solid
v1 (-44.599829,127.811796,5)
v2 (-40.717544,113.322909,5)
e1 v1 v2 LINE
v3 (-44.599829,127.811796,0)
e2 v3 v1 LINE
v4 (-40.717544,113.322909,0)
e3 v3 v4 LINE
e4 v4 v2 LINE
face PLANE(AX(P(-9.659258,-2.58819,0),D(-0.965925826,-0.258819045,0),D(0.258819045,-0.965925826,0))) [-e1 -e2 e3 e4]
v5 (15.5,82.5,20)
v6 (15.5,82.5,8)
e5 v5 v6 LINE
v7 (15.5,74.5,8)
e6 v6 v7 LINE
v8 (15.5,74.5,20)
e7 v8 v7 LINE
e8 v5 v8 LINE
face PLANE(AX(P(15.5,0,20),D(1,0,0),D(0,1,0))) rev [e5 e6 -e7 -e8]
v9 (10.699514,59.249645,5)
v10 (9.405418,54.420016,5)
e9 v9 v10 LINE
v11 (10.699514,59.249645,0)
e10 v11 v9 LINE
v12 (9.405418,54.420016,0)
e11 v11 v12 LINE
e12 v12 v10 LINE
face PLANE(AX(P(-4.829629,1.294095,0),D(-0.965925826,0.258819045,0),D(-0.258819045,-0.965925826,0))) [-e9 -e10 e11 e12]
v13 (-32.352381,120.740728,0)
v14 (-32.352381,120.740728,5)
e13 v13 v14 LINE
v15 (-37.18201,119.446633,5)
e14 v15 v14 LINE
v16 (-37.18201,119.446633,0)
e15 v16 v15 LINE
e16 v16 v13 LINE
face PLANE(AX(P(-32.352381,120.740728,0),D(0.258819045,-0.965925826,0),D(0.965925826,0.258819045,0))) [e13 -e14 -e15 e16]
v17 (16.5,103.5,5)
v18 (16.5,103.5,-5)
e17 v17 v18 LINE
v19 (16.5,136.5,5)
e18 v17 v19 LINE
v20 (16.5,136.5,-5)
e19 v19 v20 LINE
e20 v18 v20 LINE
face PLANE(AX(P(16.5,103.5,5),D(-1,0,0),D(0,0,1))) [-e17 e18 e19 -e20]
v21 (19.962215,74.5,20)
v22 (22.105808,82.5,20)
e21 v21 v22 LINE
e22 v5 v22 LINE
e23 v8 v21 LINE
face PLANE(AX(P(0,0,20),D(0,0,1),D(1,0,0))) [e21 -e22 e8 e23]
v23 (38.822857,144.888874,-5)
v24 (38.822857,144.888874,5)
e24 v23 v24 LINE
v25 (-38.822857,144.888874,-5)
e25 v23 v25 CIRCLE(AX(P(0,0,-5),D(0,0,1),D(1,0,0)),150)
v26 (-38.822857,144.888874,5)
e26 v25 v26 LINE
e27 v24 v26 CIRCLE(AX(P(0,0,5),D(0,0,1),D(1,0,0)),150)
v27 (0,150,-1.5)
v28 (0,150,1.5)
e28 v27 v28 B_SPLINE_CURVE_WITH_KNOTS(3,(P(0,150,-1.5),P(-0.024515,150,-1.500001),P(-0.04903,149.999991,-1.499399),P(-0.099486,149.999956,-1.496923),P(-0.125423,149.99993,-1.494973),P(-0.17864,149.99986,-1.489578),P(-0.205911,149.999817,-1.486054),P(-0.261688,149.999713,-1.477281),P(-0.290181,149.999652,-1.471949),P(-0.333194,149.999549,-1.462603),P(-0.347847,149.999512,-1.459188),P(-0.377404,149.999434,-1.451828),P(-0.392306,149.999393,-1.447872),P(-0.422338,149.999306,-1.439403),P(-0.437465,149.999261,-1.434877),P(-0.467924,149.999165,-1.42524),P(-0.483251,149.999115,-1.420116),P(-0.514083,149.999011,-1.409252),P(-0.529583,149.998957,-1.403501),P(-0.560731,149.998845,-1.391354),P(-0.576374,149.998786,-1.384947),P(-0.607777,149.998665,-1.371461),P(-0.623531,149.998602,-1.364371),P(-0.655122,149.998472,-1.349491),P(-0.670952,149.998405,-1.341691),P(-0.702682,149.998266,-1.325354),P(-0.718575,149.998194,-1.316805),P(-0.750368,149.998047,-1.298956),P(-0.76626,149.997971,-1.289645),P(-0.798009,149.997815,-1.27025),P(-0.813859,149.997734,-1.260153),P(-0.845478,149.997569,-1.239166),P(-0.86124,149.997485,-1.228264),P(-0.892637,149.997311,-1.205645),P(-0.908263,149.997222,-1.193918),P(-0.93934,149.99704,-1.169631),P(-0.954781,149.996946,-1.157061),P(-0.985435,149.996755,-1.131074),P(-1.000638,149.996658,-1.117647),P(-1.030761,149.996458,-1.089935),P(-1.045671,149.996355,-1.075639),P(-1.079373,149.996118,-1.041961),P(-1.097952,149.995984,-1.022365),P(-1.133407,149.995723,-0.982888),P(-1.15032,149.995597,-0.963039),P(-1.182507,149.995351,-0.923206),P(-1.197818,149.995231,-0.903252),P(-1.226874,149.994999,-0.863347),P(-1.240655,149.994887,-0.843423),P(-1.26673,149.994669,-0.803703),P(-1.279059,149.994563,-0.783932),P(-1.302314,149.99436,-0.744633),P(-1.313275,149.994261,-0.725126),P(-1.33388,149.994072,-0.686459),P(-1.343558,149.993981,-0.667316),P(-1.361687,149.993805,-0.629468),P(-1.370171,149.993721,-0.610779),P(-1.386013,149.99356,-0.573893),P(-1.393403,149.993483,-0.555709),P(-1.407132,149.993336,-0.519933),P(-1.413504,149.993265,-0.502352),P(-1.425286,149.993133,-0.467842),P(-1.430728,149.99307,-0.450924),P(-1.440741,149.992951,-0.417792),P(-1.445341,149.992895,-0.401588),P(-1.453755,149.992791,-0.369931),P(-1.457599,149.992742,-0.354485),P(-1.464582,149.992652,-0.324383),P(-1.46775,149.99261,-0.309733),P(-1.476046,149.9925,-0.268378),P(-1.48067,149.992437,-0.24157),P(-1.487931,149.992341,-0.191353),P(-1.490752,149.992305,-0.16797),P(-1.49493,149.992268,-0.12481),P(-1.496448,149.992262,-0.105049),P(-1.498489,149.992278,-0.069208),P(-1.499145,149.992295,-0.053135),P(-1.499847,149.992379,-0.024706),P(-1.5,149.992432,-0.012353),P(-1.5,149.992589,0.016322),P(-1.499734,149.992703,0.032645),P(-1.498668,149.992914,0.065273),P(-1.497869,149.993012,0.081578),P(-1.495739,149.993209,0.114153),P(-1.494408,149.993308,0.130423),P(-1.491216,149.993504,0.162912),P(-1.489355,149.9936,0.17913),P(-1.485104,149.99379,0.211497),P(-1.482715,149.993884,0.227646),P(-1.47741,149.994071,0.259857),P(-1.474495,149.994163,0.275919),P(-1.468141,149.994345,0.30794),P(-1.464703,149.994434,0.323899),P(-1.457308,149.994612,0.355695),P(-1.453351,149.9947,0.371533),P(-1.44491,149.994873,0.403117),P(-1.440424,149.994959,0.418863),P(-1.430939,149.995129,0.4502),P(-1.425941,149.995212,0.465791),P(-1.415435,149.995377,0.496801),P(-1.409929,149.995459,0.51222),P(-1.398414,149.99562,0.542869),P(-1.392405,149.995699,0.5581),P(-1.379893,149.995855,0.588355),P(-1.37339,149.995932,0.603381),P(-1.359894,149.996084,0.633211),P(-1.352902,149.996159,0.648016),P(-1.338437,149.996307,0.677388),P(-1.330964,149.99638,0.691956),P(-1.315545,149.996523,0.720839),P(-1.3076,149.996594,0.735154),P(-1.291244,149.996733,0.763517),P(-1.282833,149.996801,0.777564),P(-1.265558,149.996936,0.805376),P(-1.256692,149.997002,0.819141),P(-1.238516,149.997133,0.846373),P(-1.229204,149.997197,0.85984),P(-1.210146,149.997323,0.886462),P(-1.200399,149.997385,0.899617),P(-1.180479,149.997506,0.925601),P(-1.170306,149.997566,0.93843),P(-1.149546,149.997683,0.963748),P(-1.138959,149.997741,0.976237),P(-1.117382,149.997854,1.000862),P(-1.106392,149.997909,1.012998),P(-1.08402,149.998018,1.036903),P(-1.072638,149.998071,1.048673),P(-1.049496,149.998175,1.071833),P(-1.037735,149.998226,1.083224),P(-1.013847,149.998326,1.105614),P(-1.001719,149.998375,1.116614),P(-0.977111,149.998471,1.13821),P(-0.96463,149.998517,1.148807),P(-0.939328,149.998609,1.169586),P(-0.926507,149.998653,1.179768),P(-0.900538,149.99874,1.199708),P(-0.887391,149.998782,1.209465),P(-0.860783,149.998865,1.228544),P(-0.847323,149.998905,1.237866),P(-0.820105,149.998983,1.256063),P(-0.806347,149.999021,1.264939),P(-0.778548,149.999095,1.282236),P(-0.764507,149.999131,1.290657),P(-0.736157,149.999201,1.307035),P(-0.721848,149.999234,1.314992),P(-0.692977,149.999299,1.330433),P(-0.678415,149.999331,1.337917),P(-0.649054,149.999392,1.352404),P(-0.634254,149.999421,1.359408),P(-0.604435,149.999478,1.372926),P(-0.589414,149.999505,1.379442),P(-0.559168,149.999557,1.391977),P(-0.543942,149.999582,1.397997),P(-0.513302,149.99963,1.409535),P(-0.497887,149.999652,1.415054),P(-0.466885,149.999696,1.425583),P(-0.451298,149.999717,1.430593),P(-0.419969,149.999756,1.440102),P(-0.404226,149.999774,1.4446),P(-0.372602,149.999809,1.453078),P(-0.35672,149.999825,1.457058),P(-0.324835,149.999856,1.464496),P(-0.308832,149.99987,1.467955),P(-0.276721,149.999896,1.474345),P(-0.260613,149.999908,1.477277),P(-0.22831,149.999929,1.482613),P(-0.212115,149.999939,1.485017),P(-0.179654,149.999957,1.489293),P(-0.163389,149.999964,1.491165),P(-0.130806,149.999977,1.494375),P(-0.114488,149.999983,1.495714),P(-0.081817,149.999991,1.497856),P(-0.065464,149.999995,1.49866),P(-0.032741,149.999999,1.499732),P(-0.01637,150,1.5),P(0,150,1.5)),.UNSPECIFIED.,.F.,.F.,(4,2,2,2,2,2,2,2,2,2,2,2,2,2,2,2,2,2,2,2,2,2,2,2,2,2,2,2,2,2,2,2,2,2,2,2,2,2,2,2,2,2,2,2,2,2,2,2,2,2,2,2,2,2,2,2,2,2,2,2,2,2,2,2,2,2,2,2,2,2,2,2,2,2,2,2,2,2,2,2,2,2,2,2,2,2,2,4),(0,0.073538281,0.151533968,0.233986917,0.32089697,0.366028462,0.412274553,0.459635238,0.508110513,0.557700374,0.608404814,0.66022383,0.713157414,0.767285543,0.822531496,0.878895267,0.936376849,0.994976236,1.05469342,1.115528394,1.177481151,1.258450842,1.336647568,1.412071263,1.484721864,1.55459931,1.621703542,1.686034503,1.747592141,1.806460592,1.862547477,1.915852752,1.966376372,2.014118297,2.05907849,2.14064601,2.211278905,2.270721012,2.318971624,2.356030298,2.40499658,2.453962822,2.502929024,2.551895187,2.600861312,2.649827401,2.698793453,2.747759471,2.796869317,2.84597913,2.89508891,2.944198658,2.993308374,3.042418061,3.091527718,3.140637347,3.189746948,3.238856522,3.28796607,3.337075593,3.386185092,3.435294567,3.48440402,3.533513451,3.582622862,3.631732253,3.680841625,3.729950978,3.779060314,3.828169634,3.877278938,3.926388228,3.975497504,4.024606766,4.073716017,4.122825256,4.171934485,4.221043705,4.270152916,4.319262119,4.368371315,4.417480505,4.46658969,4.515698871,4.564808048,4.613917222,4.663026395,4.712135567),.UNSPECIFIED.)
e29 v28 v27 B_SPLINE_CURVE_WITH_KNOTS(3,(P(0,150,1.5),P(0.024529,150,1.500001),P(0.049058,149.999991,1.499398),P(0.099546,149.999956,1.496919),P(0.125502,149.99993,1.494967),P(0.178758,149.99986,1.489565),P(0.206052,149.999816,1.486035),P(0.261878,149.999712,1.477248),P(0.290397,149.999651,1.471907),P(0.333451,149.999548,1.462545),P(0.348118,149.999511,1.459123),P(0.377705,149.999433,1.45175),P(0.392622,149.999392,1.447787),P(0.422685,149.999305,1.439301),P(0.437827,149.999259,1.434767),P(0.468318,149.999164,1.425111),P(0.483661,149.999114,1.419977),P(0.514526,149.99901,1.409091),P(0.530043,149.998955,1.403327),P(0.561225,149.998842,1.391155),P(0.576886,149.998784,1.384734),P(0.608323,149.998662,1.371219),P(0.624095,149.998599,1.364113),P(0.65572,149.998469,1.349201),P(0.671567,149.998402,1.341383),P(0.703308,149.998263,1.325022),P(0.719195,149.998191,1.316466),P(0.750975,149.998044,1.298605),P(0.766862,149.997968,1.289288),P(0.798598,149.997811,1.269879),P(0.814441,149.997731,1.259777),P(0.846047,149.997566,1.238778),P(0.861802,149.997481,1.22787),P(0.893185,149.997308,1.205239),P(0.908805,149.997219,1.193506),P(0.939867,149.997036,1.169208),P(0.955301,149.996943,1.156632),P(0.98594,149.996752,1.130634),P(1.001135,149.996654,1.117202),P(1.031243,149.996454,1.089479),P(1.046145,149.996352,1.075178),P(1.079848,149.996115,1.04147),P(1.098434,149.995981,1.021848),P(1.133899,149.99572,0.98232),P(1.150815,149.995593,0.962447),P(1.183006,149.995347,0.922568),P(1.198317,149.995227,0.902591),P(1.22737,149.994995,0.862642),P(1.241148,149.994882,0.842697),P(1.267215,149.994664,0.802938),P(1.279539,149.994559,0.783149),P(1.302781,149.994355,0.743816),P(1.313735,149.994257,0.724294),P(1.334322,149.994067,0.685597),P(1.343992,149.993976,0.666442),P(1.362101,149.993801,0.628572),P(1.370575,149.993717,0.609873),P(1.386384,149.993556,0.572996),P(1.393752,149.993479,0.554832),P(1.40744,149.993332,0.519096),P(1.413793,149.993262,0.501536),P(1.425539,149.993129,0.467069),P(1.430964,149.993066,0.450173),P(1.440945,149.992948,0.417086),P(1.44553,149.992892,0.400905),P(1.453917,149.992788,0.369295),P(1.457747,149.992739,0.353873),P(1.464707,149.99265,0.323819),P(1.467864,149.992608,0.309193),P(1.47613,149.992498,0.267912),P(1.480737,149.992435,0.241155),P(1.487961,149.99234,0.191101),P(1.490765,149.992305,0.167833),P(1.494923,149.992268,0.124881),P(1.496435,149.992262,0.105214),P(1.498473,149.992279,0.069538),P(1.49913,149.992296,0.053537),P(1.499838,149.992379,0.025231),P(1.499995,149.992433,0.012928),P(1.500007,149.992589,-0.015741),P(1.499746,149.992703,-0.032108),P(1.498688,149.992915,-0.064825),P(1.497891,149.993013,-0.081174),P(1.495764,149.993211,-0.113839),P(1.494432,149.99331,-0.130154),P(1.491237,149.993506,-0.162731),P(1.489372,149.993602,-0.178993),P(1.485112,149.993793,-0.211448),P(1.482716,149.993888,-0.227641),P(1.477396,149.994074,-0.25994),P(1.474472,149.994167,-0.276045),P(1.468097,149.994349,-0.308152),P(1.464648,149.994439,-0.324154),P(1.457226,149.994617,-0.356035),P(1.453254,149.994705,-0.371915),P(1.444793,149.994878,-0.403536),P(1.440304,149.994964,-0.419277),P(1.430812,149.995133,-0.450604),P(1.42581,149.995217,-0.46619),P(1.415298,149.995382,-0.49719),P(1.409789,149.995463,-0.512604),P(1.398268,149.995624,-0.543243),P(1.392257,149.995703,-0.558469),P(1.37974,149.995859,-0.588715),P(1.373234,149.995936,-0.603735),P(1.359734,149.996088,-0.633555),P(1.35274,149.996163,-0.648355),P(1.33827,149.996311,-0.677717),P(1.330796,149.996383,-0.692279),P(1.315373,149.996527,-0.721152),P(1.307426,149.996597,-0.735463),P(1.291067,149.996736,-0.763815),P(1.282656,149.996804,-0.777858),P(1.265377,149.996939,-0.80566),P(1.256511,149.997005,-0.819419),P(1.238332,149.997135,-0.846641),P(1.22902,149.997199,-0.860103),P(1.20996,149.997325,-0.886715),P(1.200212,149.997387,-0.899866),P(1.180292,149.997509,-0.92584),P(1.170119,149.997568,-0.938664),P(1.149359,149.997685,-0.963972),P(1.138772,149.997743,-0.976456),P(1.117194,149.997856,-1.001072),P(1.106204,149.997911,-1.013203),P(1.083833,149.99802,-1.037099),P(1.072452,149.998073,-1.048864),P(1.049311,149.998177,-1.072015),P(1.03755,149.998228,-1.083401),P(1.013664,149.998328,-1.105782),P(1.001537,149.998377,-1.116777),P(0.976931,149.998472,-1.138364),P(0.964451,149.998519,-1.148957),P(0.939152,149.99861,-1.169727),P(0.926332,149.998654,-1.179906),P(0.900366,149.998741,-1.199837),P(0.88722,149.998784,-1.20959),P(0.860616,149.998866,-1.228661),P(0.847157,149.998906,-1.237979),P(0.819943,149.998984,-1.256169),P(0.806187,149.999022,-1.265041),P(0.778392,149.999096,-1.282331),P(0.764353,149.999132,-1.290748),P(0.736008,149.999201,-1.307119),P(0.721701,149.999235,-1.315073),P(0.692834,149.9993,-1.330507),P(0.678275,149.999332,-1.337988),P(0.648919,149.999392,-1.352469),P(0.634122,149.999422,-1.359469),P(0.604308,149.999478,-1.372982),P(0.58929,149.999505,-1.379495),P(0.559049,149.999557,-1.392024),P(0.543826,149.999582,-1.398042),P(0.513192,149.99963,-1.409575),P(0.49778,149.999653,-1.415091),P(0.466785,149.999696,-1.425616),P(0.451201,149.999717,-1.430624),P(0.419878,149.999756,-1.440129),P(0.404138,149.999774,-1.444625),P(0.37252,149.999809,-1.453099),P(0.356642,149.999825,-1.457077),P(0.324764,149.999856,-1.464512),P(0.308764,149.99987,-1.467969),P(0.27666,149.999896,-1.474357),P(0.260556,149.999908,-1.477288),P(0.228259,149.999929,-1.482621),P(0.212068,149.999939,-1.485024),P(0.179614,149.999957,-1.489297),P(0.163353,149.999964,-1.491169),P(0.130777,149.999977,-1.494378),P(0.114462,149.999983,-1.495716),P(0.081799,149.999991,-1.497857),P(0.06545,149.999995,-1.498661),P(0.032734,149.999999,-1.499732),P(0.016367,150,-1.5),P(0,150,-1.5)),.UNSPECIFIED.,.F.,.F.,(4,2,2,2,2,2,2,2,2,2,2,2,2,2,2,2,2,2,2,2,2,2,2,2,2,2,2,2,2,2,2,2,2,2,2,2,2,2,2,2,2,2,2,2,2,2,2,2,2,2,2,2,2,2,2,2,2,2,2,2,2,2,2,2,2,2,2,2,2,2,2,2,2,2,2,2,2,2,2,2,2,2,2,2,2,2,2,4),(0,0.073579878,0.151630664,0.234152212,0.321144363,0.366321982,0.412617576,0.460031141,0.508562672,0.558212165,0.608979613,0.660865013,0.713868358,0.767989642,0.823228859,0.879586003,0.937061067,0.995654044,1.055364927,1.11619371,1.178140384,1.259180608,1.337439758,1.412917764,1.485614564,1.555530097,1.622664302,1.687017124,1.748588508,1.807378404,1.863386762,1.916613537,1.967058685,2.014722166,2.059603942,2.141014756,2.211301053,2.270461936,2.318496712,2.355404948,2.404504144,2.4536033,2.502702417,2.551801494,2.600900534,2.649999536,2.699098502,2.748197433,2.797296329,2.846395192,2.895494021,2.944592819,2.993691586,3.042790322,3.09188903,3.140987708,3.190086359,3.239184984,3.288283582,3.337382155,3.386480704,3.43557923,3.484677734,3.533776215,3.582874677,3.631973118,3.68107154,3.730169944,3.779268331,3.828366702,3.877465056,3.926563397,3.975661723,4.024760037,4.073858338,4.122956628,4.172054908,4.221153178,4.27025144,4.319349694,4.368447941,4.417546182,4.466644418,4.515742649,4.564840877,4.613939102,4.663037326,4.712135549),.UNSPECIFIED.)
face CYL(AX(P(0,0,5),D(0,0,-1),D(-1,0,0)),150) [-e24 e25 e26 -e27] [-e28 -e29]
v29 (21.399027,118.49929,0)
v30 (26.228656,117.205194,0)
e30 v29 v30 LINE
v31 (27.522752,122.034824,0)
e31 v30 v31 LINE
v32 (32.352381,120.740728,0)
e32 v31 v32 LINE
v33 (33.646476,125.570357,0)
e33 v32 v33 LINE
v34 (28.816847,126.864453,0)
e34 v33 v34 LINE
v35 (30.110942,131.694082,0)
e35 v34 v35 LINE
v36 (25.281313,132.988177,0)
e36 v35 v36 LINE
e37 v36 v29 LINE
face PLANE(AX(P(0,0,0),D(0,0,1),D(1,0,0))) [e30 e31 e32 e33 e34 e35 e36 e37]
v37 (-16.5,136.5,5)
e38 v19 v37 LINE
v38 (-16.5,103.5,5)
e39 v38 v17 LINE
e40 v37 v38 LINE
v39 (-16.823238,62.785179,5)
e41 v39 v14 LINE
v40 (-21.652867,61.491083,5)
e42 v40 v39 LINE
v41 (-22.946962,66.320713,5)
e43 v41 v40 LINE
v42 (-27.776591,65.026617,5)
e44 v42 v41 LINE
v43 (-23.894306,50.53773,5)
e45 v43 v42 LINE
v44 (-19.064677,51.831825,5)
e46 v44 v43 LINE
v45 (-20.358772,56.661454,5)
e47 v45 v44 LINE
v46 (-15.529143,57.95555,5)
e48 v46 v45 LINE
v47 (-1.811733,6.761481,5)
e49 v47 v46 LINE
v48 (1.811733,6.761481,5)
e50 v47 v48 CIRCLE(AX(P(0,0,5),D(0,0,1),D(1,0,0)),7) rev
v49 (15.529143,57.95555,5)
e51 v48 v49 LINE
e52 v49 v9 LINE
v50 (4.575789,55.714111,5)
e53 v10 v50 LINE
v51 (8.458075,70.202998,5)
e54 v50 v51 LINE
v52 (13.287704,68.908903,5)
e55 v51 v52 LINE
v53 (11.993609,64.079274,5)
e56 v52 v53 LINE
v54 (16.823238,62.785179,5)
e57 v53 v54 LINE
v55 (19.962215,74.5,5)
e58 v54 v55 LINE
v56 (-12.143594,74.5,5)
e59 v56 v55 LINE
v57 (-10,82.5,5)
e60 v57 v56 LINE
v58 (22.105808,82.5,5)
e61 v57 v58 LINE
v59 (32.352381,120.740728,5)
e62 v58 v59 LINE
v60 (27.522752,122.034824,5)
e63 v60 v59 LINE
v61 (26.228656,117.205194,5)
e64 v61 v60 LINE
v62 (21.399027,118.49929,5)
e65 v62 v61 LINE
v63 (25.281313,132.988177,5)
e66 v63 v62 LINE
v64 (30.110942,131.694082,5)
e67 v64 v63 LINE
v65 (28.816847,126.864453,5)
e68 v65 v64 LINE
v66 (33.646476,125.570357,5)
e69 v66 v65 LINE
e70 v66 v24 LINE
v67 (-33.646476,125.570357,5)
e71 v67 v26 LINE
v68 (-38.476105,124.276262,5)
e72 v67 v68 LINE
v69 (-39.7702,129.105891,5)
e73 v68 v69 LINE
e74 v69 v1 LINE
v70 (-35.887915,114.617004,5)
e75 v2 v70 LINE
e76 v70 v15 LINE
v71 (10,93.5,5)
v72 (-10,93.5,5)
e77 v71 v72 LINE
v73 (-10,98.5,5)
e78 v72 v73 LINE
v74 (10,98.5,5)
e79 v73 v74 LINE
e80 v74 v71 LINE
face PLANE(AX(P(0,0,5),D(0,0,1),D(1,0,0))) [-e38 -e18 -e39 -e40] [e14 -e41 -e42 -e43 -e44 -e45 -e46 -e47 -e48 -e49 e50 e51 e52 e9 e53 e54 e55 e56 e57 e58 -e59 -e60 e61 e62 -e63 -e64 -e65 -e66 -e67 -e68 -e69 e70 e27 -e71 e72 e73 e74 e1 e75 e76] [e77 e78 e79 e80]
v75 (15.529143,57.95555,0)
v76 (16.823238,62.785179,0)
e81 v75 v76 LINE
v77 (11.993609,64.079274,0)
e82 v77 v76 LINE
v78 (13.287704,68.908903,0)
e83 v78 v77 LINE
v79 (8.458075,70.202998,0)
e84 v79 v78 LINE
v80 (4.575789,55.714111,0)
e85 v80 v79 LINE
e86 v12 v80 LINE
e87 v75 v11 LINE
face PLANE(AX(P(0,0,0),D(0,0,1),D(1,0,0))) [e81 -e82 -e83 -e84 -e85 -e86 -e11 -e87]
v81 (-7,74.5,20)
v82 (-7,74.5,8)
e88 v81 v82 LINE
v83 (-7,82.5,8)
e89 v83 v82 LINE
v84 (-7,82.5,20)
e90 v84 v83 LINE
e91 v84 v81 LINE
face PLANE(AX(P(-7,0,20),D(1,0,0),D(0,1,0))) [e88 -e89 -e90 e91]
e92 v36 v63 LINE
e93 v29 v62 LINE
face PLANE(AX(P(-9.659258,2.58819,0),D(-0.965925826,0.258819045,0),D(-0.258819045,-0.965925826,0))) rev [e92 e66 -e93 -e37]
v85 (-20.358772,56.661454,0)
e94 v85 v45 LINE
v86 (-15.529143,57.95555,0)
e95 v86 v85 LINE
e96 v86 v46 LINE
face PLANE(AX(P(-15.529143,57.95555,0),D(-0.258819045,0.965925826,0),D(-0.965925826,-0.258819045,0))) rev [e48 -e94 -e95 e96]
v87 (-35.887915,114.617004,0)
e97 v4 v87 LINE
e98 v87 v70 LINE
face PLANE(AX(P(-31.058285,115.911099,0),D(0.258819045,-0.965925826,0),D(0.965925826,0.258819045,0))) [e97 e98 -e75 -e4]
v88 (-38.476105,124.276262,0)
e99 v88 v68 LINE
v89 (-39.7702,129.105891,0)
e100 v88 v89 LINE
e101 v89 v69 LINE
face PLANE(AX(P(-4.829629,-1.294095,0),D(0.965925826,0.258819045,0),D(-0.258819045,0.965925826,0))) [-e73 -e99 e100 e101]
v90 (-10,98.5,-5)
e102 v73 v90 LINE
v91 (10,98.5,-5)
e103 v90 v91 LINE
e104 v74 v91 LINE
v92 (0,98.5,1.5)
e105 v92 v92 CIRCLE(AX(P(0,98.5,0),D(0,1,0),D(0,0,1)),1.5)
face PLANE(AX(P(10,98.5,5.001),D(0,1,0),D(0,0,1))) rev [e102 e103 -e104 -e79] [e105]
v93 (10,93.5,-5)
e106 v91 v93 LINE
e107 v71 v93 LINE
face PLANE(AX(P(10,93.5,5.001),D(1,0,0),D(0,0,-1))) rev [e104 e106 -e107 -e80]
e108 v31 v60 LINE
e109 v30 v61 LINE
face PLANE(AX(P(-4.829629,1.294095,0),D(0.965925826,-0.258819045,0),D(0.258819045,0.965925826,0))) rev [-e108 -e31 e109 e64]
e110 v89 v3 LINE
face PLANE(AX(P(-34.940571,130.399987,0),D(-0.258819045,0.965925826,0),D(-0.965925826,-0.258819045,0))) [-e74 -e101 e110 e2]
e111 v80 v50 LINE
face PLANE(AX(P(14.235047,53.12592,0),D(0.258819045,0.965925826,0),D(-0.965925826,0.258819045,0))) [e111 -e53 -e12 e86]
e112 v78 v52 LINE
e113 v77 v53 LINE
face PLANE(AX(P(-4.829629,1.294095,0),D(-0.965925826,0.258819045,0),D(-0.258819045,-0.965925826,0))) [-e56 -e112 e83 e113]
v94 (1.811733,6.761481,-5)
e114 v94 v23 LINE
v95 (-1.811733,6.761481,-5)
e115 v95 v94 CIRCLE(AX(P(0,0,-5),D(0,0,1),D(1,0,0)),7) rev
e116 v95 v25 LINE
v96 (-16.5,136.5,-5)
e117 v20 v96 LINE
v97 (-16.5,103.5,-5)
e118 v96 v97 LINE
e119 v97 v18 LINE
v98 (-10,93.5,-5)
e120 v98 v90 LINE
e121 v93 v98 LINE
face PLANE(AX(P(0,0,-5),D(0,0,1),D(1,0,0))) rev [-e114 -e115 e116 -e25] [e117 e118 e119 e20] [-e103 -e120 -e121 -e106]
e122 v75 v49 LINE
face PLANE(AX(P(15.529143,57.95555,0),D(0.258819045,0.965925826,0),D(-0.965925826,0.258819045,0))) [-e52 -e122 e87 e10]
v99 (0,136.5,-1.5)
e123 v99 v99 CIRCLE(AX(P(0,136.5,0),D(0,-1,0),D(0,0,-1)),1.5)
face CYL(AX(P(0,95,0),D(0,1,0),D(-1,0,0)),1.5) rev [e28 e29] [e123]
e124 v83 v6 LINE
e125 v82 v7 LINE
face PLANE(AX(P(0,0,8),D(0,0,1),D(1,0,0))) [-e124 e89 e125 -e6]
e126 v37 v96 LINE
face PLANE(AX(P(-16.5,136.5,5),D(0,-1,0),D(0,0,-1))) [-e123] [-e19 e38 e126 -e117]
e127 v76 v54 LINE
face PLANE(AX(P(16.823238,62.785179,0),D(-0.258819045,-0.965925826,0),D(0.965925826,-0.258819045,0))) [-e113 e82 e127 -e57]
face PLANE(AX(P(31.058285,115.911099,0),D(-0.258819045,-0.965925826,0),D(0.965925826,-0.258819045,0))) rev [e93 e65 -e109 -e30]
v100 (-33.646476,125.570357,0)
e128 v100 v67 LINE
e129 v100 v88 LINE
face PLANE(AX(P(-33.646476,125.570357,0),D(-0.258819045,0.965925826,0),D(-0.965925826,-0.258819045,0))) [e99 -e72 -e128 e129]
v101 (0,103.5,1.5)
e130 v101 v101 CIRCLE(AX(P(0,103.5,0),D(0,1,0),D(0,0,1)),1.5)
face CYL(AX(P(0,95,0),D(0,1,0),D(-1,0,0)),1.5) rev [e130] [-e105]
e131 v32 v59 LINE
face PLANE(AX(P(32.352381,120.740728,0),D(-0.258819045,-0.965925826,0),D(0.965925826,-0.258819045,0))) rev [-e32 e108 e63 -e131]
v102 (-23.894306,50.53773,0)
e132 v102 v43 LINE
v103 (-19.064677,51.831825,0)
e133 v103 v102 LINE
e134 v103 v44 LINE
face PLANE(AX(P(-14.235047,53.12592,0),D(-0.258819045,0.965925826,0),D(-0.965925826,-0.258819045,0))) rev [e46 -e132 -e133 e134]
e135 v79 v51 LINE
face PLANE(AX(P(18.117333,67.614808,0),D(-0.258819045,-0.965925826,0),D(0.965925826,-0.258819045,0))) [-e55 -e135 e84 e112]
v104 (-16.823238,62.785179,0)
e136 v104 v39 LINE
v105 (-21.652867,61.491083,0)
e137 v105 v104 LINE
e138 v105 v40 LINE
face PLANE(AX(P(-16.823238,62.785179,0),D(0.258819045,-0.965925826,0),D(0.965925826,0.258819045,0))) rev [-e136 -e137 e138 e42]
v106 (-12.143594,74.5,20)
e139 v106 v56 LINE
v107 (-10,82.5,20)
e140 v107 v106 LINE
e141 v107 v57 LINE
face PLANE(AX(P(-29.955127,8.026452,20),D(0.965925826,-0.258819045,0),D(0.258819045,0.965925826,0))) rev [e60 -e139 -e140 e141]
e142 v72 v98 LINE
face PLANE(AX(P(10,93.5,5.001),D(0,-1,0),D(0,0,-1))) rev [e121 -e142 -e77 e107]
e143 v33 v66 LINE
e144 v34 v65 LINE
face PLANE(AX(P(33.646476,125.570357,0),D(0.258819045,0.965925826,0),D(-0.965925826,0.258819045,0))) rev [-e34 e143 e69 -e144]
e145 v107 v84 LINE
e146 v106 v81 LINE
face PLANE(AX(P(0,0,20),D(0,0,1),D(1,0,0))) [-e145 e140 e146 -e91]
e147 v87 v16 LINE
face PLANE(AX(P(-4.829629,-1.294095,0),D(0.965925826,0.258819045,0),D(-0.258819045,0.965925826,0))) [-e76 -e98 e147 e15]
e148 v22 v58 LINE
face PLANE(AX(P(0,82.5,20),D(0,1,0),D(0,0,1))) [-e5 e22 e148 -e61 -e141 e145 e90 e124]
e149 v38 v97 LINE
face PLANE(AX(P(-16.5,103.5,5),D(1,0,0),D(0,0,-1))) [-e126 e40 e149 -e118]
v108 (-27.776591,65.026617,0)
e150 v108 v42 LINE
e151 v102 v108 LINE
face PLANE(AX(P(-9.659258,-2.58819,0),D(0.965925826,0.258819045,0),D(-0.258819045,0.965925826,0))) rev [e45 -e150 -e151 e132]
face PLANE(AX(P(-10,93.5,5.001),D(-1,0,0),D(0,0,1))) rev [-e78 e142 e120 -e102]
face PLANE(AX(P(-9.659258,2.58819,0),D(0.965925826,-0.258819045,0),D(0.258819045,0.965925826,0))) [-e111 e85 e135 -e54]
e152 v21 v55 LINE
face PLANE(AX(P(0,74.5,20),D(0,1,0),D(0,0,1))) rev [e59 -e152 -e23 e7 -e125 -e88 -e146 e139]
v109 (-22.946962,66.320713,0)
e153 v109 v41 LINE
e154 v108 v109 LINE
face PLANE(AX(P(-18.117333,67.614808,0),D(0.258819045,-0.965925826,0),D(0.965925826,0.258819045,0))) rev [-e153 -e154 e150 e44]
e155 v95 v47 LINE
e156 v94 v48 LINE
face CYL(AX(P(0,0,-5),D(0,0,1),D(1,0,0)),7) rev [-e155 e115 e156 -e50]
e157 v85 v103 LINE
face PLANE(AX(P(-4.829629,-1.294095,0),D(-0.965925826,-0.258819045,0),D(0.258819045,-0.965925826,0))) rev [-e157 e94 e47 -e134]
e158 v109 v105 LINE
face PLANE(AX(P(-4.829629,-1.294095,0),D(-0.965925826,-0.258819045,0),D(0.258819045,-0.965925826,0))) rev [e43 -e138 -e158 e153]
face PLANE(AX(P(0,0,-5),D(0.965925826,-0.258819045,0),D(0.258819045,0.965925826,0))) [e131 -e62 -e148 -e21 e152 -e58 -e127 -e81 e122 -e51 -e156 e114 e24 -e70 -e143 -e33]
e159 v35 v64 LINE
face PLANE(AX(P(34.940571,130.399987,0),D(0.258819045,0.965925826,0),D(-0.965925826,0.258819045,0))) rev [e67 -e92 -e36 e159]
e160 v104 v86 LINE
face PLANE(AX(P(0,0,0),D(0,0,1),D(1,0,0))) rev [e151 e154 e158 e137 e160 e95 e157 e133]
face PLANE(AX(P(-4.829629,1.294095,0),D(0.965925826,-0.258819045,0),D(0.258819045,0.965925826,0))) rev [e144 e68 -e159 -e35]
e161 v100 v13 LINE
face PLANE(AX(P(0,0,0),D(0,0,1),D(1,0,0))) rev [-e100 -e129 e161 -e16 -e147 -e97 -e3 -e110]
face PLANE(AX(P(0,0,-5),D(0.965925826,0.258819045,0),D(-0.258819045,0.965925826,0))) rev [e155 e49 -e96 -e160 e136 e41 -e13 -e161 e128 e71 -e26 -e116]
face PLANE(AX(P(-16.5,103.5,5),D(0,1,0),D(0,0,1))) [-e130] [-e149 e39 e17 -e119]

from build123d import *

# Parameters (mm, degrees)
SKETCH1_R           = 150
SKETCH1_W           = 33
SKETCH1_H           = 33
BOSS_EXTRUDE1_DEPTH = 5
SKETCH4_R           = 1.5
CUT_EXTRUDE1_DEPTH  = 55
CIRPATTERN1_COUNT   = 12
CUT_EXTRUDE2_REACH  = 214.368
SKETCH5_W           = 20
SKETCH5_H           = 5
SKETCH5_W_2         = 5
SKETCH5_H_2         = 20
CUT_EXTRUDE3_DEPTH  = 10
BOSS_EXTRUDE2_DEPTH = 5
CUT_EXTRUDE4_DEPTH  = 5
BOSS_EXTRUDE3_DEPTH = 15
SKETCH11_W          = 22.5
SKETCH11_H          = 8
BOSS_EXTRUDE4_DEPTH = 3


with BuildPart() as part:
    # Sketch1 → Boss-Extrude1 (new, symmetric)
    with BuildSketch(Plane.XY):
        Circle(SKETCH1_R)
        Polygon((37.460580838, 97.883629292), (66.039419162, 81.383629292), (82.539419162, 109.962467617), (53.960580838, 126.462467617), align=None, mode=Mode.SUBTRACT)
        with Locations((0, 120)):
            Rectangle(SKETCH1_W, SKETCH1_H, mode=Mode.SUBTRACT)
        Polygon((81.383629292, 66.039419162), (97.883629292, 37.460580838), (126.462467617, 53.960580838), (109.962467617, 82.539419162), align=None, mode=Mode.SUBTRACT)
        with Locations((120, 0)):
            Rectangle(SKETCH1_W, SKETCH1_H, mode=Mode.SUBTRACT)
        Polygon((97.883629292, -37.460580838), (81.383629292, -66.039419162), (109.962467617, -82.539419162), (126.462467617, -53.960580838), align=None, mode=Mode.SUBTRACT)
        Polygon((66.039419162, -81.383629292), (37.460580838, -97.883629292), (53.960580838, -126.462467617), (82.539419162, -109.962467617), align=None, mode=Mode.SUBTRACT)
        with Locations((0, -120)):
            Rectangle(SKETCH1_W, SKETCH1_H, mode=Mode.SUBTRACT)
        Polygon((-37.460580838, -97.883629292), (-66.039419162, -81.383629292), (-82.539419162, -109.962467617), (-53.960580838, -126.462467617), align=None, mode=Mode.SUBTRACT)
        Polygon((-81.383629292, -66.039419162), (-97.883629292, -37.460580838), (-126.462467617, -53.960580838), (-109.962467617, -82.539419162), align=None, mode=Mode.SUBTRACT)
        with Locations((-120, 0)):
            Rectangle(SKETCH1_W, SKETCH1_H, mode=Mode.SUBTRACT)
        Polygon((-97.883629292, 37.460580838), (-81.383629292, 66.039419162), (-109.962467617, 82.539419162), (-126.462467617, 53.960580838), align=None, mode=Mode.SUBTRACT)
        Polygon((-66.039419162, 81.383629292), (-37.460580838, 97.883629292), (-53.960580838, 126.462467617), (-82.539419162, 109.962467617), align=None, mode=Mode.SUBTRACT)
    extrude(amount=BOSS_EXTRUDE1_DEPTH, both=True)

    # Sketch4 → Cut-Extrude1 (cut)
    with BuildSketch(Plane(origin=(0, -150, 0), x_dir=(-1, 0, 0), z_dir=(0, -1, 0))):
        Circle(SKETCH4_R)
    cut_extrude1 = extrude(amount=-CUT_EXTRUDE1_DEPTH, mode=Mode.SUBTRACT)

    # CirPattern1: Cut-Extrude1 ×12 about axis
    cirpattern1_axis = Axis((0, 0, 5), (0, 0, -1))
    for i in range(1, CIRPATTERN1_COUNT):
        add(cut_extrude1.rotate(cirpattern1_axis, i * 360 / CIRPATTERN1_COUNT), mode=Mode.SUBTRACT)

    # Sketch5 → Cut-Extrude2 (cut, up to next)
    with BuildSketch(Plane(origin=(0, 0, -5), x_dir=(-1, 0, 0), z_dir=(0, 0, -1)), mode=Mode.PRIVATE) as cut_extrude2_sk1:
        Polygon((38.089745962, 85.973375254), (55.410254038, 75.973375254), (57.910254038, 80.303502273), (40.589745962, 90.303502273), align=None)
    cut_extrude2_tool1 = extrude(cut_extrude2_sk1.sketch, amount=-CUT_EXTRUDE2_REACH, mode=Mode.PRIVATE) & part.part
    # Sketch5 → Cut-Extrude2 (cut, up to next)
    with BuildSketch(Plane(origin=(0, 0, -5), x_dir=(-1, 0, 0), z_dir=(0, 0, -1)), mode=Mode.PRIVATE) as cut_extrude2_sk2:
        with Locations((0, 96)):
            Rectangle(SKETCH5_W, SKETCH5_H)
    cut_extrude2_tool2 = extrude(cut_extrude2_sk2.sketch, amount=-CUT_EXTRUDE2_REACH, mode=Mode.PRIVATE) & part.part
    # Sketch5 → Cut-Extrude2 (cut, up to next)
    with BuildSketch(Plane(origin=(0, 0, -5), x_dir=(-1, 0, 0), z_dir=(0, 0, -1)), mode=Mode.PRIVATE) as cut_extrude2_sk3:
        Polygon((75.973375254, 55.410254038), (85.973375254, 38.089745962), (90.303502273, 40.589745962), (80.303502273, 57.910254038), align=None)
    cut_extrude2_tool3 = extrude(cut_extrude2_sk3.sketch, amount=-CUT_EXTRUDE2_REACH, mode=Mode.PRIVATE) & part.part
    # Sketch5 → Cut-Extrude2 (cut, up to next)
    with BuildSketch(Plane(origin=(0, 0, -5), x_dir=(-1, 0, 0), z_dir=(0, 0, -1)), mode=Mode.PRIVATE) as cut_extrude2_sk4:
        with Locations((96, 0)):
            Rectangle(SKETCH5_W_2, SKETCH5_H_2)
    cut_extrude2_tool4 = extrude(cut_extrude2_sk4.sketch, amount=-CUT_EXTRUDE2_REACH, mode=Mode.PRIVATE) & part.part
    # Sketch5 → Cut-Extrude2 (cut, up to next)
    with BuildSketch(Plane(origin=(0, 0, -5), x_dir=(-1, 0, 0), z_dir=(0, 0, -1)), mode=Mode.PRIVATE) as cut_extrude2_sk5:
        Polygon((85.973375254, -38.089745962), (75.973375254, -55.410254038), (80.303502273, -57.910254038), (90.303502273, -40.589745962), align=None)
    cut_extrude2_tool5 = extrude(cut_extrude2_sk5.sketch, amount=-CUT_EXTRUDE2_REACH, mode=Mode.PRIVATE) & part.part
    # Sketch5 → Cut-Extrude2 (cut, up to next)
    with BuildSketch(Plane(origin=(0, 0, -5), x_dir=(-1, 0, 0), z_dir=(0, 0, -1)), mode=Mode.PRIVATE) as cut_extrude2_sk6:
        Polygon((55.410254038, -75.973375254), (38.089745962, -85.973375254), (40.589745962, -90.303502273), (57.910254038, -80.303502273), align=None)
    cut_extrude2_tool6 = extrude(cut_extrude2_sk6.sketch, amount=-CUT_EXTRUDE2_REACH, mode=Mode.PRIVATE) & part.part
    # Sketch5 → Cut-Extrude2 (cut, up to next)
    with BuildSketch(Plane(origin=(0, 0, -5), x_dir=(-1, 0, 0), z_dir=(0, 0, -1)), mode=Mode.PRIVATE) as cut_extrude2_sk7:
        with Locations((0, -96)):
            Rectangle(SKETCH5_W, SKETCH5_H)
    cut_extrude2_tool7 = extrude(cut_extrude2_sk7.sketch, amount=-CUT_EXTRUDE2_REACH, mode=Mode.PRIVATE) & part.part
    # Sketch5 → Cut-Extrude2 (cut, up to next)
    with BuildSketch(Plane(origin=(0, 0, -5), x_dir=(-1, 0, 0), z_dir=(0, 0, -1)), mode=Mode.PRIVATE) as cut_extrude2_sk8:
        Polygon((-38.089745962, -85.973375254), (-55.410254038, -75.973375254), (-57.910254038, -80.303502273), (-40.589745962, -90.303502273), align=None)
    cut_extrude2_tool8 = extrude(cut_extrude2_sk8.sketch, amount=-CUT_EXTRUDE2_REACH, mode=Mode.PRIVATE) & part.part
    # Sketch5 → Cut-Extrude2 (cut, up to next)
    with BuildSketch(Plane(origin=(0, 0, -5), x_dir=(-1, 0, 0), z_dir=(0, 0, -1)), mode=Mode.PRIVATE) as cut_extrude2_sk9:
        Polygon((-75.973375254, -55.410254038), (-85.973375254, -38.089745962), (-90.303502273, -40.589745962), (-80.303502273, -57.910254038), align=None)
    cut_extrude2_tool9 = extrude(cut_extrude2_sk9.sketch, amount=-CUT_EXTRUDE2_REACH, mode=Mode.PRIVATE) & part.part
    # Sketch5 → Cut-Extrude2 (cut, up to next)
    with BuildSketch(Plane(origin=(0, 0, -5), x_dir=(-1, 0, 0), z_dir=(0, 0, -1)), mode=Mode.PRIVATE) as cut_extrude2_sk10:
        with Locations((-96, 0)):
            Rectangle(SKETCH5_W_2, SKETCH5_H_2)
    cut_extrude2_tool10 = extrude(cut_extrude2_sk10.sketch, amount=-CUT_EXTRUDE2_REACH, mode=Mode.PRIVATE) & part.part
    # Sketch5 → Cut-Extrude2 (cut, up to next)
    with BuildSketch(Plane(origin=(0, 0, -5), x_dir=(-1, 0, 0), z_dir=(0, 0, -1)), mode=Mode.PRIVATE) as cut_extrude2_sk11:
        Polygon((-85.973375254, 38.089745962), (-75.973375254, 55.410254038), (-80.303502273, 57.910254038), (-90.303502273, 40.589745962), align=None)
    cut_extrude2_tool11 = extrude(cut_extrude2_sk11.sketch, amount=-CUT_EXTRUDE2_REACH, mode=Mode.PRIVATE) & part.part
    # Sketch5 → Cut-Extrude2 (cut, up to next)
    with BuildSketch(Plane(origin=(0, 0, -5), x_dir=(-1, 0, 0), z_dir=(0, 0, -1)), mode=Mode.PRIVATE) as cut_extrude2_sk12:
        Polygon((-55.410254038, 75.973375254), (-38.089745962, 85.973375254), (-40.589745962, 90.303502273), (-57.910254038, 80.303502273), align=None)
    cut_extrude2_tool12 = extrude(cut_extrude2_sk12.sketch, amount=-CUT_EXTRUDE2_REACH, mode=Mode.PRIVATE) & part.part
    add(cut_extrude2_tool1.solids().sort_by_distance((-48, 83.138439, -5))[0], mode=Mode.SUBTRACT)
    add(cut_extrude2_tool2.solids().sort_by_distance((0, 96, -5))[0], mode=Mode.SUBTRACT)
    add(cut_extrude2_tool3.solids().sort_by_distance((-83.138439, 48, -5))[0], mode=Mode.SUBTRACT)
    add(cut_extrude2_tool4.solids().sort_by_distance((-96, 0, -5))[0], mode=Mode.SUBTRACT)
    add(cut_extrude2_tool5.solids().sort_by_distance((-83.138439, -48, -5))[0], mode=Mode.SUBTRACT)
    add(cut_extrude2_tool6.solids().sort_by_distance((-48, -83.138439, -5))[0], mode=Mode.SUBTRACT)
    add(cut_extrude2_tool7.solids().sort_by_distance((0, -96, -5))[0], mode=Mode.SUBTRACT)
    add(cut_extrude2_tool8.solids().sort_by_distance((48, -83.138439, -5))[0], mode=Mode.SUBTRACT)
    add(cut_extrude2_tool9.solids().sort_by_distance((83.138439, -48, -5))[0], mode=Mode.SUBTRACT)
    add(cut_extrude2_tool10.solids().sort_by_distance((96, 0, -5))[0], mode=Mode.SUBTRACT)
    add(cut_extrude2_tool11.solids().sort_by_distance((83.138439, 48, -5))[0], mode=Mode.SUBTRACT)
    add(cut_extrude2_tool12.solids().sort_by_distance((48, 83.138439, -5))[0], mode=Mode.SUBTRACT)

    # Sketch6 → Cut-Extrude3 (cut)
    with BuildSketch(Plane.XY.offset(5)):
        with BuildLine():
            Line((38.822856765, 144.888873943), (1.811733316, 6.761480784))
            ThreePointArc((1.811733316, 6.761480784), (0, 7), (-1.811733316, 6.761480784))
            Line((-1.811733316, 6.761480784), (-38.822856765, 144.888873943))
            ThreePointArc((-38.822856765, 144.888873943), (0, -150), (38.822856765, 144.888873943))
        make_face()
    extrude(amount=-CUT_EXTRUDE3_DEPTH, mode=Mode.SUBTRACT)

    # Sketch7 → Boss-Extrude2 (add)
    with BuildSketch(Plane.XY.offset(5)):
        Polygon((-20.358771838, 56.661454352), (-15.529142706, 57.955549577), (-16.823237932, 62.785178709), (-21.652867063, 61.491083483), (-22.946962289, 66.320712615), (-27.77659142, 65.026617389), (-23.894305744, 50.537729995), (-19.064676612, 51.83182522), align=None)
        Polygon((-37.182009769, 119.446633061), (-32.352380638, 120.740728286), (-33.646475863, 125.570357418), (-38.476104995, 124.276262192), (-39.77020022, 129.105891324), (-44.599829352, 127.811796098), (-40.717543675, 113.322908704), (-35.887914544, 114.617003929), align=None)
    extrude(amount=-BOSS_EXTRUDE2_DEPTH)

    # Sketch9 → Cut-Extrude4 (cut)
    with BuildSketch(Plane.XY.offset(5)):
        Polygon((32.352380638, 120.740728286), (33.646475863, 125.570357418), (28.816846732, 126.864452643), (30.110941957, 131.694081775), (25.281312826, 132.988177), (21.399027149, 118.499289606), (26.228656281, 117.20519438), (27.522751506, 122.034823512), align=None)
        Polygon((15.529142706, 57.955549577), (16.823237932, 62.785178709), (11.9936088, 64.079273934), (13.287704026, 68.908903066), (8.458074894, 70.202998291), (4.575789218, 55.714110897), (9.405418349, 54.420015671), (10.699513575, 59.249644803), align=None)
    extrude(amount=-CUT_EXTRUDE4_DEPTH, mode=Mode.SUBTRACT)

    # Sketch10 → Boss-Extrude3 (add)
    with BuildSketch(Plane.XY.offset(5)):
        Polygon((-7, 82.5), (-10, 82.5), (-12.143593539, 74.5), (-7, 74.5), align=None)
        Polygon((22.105808376, 82.5), (15.5, 82.5), (15.5, 74.5), (19.962214836, 74.5), align=None)
    extrude(amount=BOSS_EXTRUDE3_DEPTH)

    # Sketch11 → Boss-Extrude4 (add)
    with BuildSketch(Plane.XY.offset(5)):
        with Locations((4.25, 78.5)):
            Rectangle(SKETCH11_W, SKETCH11_H)
    extrude(amount=BOSS_EXTRUDE4_DEPTH)


solid = part.part
